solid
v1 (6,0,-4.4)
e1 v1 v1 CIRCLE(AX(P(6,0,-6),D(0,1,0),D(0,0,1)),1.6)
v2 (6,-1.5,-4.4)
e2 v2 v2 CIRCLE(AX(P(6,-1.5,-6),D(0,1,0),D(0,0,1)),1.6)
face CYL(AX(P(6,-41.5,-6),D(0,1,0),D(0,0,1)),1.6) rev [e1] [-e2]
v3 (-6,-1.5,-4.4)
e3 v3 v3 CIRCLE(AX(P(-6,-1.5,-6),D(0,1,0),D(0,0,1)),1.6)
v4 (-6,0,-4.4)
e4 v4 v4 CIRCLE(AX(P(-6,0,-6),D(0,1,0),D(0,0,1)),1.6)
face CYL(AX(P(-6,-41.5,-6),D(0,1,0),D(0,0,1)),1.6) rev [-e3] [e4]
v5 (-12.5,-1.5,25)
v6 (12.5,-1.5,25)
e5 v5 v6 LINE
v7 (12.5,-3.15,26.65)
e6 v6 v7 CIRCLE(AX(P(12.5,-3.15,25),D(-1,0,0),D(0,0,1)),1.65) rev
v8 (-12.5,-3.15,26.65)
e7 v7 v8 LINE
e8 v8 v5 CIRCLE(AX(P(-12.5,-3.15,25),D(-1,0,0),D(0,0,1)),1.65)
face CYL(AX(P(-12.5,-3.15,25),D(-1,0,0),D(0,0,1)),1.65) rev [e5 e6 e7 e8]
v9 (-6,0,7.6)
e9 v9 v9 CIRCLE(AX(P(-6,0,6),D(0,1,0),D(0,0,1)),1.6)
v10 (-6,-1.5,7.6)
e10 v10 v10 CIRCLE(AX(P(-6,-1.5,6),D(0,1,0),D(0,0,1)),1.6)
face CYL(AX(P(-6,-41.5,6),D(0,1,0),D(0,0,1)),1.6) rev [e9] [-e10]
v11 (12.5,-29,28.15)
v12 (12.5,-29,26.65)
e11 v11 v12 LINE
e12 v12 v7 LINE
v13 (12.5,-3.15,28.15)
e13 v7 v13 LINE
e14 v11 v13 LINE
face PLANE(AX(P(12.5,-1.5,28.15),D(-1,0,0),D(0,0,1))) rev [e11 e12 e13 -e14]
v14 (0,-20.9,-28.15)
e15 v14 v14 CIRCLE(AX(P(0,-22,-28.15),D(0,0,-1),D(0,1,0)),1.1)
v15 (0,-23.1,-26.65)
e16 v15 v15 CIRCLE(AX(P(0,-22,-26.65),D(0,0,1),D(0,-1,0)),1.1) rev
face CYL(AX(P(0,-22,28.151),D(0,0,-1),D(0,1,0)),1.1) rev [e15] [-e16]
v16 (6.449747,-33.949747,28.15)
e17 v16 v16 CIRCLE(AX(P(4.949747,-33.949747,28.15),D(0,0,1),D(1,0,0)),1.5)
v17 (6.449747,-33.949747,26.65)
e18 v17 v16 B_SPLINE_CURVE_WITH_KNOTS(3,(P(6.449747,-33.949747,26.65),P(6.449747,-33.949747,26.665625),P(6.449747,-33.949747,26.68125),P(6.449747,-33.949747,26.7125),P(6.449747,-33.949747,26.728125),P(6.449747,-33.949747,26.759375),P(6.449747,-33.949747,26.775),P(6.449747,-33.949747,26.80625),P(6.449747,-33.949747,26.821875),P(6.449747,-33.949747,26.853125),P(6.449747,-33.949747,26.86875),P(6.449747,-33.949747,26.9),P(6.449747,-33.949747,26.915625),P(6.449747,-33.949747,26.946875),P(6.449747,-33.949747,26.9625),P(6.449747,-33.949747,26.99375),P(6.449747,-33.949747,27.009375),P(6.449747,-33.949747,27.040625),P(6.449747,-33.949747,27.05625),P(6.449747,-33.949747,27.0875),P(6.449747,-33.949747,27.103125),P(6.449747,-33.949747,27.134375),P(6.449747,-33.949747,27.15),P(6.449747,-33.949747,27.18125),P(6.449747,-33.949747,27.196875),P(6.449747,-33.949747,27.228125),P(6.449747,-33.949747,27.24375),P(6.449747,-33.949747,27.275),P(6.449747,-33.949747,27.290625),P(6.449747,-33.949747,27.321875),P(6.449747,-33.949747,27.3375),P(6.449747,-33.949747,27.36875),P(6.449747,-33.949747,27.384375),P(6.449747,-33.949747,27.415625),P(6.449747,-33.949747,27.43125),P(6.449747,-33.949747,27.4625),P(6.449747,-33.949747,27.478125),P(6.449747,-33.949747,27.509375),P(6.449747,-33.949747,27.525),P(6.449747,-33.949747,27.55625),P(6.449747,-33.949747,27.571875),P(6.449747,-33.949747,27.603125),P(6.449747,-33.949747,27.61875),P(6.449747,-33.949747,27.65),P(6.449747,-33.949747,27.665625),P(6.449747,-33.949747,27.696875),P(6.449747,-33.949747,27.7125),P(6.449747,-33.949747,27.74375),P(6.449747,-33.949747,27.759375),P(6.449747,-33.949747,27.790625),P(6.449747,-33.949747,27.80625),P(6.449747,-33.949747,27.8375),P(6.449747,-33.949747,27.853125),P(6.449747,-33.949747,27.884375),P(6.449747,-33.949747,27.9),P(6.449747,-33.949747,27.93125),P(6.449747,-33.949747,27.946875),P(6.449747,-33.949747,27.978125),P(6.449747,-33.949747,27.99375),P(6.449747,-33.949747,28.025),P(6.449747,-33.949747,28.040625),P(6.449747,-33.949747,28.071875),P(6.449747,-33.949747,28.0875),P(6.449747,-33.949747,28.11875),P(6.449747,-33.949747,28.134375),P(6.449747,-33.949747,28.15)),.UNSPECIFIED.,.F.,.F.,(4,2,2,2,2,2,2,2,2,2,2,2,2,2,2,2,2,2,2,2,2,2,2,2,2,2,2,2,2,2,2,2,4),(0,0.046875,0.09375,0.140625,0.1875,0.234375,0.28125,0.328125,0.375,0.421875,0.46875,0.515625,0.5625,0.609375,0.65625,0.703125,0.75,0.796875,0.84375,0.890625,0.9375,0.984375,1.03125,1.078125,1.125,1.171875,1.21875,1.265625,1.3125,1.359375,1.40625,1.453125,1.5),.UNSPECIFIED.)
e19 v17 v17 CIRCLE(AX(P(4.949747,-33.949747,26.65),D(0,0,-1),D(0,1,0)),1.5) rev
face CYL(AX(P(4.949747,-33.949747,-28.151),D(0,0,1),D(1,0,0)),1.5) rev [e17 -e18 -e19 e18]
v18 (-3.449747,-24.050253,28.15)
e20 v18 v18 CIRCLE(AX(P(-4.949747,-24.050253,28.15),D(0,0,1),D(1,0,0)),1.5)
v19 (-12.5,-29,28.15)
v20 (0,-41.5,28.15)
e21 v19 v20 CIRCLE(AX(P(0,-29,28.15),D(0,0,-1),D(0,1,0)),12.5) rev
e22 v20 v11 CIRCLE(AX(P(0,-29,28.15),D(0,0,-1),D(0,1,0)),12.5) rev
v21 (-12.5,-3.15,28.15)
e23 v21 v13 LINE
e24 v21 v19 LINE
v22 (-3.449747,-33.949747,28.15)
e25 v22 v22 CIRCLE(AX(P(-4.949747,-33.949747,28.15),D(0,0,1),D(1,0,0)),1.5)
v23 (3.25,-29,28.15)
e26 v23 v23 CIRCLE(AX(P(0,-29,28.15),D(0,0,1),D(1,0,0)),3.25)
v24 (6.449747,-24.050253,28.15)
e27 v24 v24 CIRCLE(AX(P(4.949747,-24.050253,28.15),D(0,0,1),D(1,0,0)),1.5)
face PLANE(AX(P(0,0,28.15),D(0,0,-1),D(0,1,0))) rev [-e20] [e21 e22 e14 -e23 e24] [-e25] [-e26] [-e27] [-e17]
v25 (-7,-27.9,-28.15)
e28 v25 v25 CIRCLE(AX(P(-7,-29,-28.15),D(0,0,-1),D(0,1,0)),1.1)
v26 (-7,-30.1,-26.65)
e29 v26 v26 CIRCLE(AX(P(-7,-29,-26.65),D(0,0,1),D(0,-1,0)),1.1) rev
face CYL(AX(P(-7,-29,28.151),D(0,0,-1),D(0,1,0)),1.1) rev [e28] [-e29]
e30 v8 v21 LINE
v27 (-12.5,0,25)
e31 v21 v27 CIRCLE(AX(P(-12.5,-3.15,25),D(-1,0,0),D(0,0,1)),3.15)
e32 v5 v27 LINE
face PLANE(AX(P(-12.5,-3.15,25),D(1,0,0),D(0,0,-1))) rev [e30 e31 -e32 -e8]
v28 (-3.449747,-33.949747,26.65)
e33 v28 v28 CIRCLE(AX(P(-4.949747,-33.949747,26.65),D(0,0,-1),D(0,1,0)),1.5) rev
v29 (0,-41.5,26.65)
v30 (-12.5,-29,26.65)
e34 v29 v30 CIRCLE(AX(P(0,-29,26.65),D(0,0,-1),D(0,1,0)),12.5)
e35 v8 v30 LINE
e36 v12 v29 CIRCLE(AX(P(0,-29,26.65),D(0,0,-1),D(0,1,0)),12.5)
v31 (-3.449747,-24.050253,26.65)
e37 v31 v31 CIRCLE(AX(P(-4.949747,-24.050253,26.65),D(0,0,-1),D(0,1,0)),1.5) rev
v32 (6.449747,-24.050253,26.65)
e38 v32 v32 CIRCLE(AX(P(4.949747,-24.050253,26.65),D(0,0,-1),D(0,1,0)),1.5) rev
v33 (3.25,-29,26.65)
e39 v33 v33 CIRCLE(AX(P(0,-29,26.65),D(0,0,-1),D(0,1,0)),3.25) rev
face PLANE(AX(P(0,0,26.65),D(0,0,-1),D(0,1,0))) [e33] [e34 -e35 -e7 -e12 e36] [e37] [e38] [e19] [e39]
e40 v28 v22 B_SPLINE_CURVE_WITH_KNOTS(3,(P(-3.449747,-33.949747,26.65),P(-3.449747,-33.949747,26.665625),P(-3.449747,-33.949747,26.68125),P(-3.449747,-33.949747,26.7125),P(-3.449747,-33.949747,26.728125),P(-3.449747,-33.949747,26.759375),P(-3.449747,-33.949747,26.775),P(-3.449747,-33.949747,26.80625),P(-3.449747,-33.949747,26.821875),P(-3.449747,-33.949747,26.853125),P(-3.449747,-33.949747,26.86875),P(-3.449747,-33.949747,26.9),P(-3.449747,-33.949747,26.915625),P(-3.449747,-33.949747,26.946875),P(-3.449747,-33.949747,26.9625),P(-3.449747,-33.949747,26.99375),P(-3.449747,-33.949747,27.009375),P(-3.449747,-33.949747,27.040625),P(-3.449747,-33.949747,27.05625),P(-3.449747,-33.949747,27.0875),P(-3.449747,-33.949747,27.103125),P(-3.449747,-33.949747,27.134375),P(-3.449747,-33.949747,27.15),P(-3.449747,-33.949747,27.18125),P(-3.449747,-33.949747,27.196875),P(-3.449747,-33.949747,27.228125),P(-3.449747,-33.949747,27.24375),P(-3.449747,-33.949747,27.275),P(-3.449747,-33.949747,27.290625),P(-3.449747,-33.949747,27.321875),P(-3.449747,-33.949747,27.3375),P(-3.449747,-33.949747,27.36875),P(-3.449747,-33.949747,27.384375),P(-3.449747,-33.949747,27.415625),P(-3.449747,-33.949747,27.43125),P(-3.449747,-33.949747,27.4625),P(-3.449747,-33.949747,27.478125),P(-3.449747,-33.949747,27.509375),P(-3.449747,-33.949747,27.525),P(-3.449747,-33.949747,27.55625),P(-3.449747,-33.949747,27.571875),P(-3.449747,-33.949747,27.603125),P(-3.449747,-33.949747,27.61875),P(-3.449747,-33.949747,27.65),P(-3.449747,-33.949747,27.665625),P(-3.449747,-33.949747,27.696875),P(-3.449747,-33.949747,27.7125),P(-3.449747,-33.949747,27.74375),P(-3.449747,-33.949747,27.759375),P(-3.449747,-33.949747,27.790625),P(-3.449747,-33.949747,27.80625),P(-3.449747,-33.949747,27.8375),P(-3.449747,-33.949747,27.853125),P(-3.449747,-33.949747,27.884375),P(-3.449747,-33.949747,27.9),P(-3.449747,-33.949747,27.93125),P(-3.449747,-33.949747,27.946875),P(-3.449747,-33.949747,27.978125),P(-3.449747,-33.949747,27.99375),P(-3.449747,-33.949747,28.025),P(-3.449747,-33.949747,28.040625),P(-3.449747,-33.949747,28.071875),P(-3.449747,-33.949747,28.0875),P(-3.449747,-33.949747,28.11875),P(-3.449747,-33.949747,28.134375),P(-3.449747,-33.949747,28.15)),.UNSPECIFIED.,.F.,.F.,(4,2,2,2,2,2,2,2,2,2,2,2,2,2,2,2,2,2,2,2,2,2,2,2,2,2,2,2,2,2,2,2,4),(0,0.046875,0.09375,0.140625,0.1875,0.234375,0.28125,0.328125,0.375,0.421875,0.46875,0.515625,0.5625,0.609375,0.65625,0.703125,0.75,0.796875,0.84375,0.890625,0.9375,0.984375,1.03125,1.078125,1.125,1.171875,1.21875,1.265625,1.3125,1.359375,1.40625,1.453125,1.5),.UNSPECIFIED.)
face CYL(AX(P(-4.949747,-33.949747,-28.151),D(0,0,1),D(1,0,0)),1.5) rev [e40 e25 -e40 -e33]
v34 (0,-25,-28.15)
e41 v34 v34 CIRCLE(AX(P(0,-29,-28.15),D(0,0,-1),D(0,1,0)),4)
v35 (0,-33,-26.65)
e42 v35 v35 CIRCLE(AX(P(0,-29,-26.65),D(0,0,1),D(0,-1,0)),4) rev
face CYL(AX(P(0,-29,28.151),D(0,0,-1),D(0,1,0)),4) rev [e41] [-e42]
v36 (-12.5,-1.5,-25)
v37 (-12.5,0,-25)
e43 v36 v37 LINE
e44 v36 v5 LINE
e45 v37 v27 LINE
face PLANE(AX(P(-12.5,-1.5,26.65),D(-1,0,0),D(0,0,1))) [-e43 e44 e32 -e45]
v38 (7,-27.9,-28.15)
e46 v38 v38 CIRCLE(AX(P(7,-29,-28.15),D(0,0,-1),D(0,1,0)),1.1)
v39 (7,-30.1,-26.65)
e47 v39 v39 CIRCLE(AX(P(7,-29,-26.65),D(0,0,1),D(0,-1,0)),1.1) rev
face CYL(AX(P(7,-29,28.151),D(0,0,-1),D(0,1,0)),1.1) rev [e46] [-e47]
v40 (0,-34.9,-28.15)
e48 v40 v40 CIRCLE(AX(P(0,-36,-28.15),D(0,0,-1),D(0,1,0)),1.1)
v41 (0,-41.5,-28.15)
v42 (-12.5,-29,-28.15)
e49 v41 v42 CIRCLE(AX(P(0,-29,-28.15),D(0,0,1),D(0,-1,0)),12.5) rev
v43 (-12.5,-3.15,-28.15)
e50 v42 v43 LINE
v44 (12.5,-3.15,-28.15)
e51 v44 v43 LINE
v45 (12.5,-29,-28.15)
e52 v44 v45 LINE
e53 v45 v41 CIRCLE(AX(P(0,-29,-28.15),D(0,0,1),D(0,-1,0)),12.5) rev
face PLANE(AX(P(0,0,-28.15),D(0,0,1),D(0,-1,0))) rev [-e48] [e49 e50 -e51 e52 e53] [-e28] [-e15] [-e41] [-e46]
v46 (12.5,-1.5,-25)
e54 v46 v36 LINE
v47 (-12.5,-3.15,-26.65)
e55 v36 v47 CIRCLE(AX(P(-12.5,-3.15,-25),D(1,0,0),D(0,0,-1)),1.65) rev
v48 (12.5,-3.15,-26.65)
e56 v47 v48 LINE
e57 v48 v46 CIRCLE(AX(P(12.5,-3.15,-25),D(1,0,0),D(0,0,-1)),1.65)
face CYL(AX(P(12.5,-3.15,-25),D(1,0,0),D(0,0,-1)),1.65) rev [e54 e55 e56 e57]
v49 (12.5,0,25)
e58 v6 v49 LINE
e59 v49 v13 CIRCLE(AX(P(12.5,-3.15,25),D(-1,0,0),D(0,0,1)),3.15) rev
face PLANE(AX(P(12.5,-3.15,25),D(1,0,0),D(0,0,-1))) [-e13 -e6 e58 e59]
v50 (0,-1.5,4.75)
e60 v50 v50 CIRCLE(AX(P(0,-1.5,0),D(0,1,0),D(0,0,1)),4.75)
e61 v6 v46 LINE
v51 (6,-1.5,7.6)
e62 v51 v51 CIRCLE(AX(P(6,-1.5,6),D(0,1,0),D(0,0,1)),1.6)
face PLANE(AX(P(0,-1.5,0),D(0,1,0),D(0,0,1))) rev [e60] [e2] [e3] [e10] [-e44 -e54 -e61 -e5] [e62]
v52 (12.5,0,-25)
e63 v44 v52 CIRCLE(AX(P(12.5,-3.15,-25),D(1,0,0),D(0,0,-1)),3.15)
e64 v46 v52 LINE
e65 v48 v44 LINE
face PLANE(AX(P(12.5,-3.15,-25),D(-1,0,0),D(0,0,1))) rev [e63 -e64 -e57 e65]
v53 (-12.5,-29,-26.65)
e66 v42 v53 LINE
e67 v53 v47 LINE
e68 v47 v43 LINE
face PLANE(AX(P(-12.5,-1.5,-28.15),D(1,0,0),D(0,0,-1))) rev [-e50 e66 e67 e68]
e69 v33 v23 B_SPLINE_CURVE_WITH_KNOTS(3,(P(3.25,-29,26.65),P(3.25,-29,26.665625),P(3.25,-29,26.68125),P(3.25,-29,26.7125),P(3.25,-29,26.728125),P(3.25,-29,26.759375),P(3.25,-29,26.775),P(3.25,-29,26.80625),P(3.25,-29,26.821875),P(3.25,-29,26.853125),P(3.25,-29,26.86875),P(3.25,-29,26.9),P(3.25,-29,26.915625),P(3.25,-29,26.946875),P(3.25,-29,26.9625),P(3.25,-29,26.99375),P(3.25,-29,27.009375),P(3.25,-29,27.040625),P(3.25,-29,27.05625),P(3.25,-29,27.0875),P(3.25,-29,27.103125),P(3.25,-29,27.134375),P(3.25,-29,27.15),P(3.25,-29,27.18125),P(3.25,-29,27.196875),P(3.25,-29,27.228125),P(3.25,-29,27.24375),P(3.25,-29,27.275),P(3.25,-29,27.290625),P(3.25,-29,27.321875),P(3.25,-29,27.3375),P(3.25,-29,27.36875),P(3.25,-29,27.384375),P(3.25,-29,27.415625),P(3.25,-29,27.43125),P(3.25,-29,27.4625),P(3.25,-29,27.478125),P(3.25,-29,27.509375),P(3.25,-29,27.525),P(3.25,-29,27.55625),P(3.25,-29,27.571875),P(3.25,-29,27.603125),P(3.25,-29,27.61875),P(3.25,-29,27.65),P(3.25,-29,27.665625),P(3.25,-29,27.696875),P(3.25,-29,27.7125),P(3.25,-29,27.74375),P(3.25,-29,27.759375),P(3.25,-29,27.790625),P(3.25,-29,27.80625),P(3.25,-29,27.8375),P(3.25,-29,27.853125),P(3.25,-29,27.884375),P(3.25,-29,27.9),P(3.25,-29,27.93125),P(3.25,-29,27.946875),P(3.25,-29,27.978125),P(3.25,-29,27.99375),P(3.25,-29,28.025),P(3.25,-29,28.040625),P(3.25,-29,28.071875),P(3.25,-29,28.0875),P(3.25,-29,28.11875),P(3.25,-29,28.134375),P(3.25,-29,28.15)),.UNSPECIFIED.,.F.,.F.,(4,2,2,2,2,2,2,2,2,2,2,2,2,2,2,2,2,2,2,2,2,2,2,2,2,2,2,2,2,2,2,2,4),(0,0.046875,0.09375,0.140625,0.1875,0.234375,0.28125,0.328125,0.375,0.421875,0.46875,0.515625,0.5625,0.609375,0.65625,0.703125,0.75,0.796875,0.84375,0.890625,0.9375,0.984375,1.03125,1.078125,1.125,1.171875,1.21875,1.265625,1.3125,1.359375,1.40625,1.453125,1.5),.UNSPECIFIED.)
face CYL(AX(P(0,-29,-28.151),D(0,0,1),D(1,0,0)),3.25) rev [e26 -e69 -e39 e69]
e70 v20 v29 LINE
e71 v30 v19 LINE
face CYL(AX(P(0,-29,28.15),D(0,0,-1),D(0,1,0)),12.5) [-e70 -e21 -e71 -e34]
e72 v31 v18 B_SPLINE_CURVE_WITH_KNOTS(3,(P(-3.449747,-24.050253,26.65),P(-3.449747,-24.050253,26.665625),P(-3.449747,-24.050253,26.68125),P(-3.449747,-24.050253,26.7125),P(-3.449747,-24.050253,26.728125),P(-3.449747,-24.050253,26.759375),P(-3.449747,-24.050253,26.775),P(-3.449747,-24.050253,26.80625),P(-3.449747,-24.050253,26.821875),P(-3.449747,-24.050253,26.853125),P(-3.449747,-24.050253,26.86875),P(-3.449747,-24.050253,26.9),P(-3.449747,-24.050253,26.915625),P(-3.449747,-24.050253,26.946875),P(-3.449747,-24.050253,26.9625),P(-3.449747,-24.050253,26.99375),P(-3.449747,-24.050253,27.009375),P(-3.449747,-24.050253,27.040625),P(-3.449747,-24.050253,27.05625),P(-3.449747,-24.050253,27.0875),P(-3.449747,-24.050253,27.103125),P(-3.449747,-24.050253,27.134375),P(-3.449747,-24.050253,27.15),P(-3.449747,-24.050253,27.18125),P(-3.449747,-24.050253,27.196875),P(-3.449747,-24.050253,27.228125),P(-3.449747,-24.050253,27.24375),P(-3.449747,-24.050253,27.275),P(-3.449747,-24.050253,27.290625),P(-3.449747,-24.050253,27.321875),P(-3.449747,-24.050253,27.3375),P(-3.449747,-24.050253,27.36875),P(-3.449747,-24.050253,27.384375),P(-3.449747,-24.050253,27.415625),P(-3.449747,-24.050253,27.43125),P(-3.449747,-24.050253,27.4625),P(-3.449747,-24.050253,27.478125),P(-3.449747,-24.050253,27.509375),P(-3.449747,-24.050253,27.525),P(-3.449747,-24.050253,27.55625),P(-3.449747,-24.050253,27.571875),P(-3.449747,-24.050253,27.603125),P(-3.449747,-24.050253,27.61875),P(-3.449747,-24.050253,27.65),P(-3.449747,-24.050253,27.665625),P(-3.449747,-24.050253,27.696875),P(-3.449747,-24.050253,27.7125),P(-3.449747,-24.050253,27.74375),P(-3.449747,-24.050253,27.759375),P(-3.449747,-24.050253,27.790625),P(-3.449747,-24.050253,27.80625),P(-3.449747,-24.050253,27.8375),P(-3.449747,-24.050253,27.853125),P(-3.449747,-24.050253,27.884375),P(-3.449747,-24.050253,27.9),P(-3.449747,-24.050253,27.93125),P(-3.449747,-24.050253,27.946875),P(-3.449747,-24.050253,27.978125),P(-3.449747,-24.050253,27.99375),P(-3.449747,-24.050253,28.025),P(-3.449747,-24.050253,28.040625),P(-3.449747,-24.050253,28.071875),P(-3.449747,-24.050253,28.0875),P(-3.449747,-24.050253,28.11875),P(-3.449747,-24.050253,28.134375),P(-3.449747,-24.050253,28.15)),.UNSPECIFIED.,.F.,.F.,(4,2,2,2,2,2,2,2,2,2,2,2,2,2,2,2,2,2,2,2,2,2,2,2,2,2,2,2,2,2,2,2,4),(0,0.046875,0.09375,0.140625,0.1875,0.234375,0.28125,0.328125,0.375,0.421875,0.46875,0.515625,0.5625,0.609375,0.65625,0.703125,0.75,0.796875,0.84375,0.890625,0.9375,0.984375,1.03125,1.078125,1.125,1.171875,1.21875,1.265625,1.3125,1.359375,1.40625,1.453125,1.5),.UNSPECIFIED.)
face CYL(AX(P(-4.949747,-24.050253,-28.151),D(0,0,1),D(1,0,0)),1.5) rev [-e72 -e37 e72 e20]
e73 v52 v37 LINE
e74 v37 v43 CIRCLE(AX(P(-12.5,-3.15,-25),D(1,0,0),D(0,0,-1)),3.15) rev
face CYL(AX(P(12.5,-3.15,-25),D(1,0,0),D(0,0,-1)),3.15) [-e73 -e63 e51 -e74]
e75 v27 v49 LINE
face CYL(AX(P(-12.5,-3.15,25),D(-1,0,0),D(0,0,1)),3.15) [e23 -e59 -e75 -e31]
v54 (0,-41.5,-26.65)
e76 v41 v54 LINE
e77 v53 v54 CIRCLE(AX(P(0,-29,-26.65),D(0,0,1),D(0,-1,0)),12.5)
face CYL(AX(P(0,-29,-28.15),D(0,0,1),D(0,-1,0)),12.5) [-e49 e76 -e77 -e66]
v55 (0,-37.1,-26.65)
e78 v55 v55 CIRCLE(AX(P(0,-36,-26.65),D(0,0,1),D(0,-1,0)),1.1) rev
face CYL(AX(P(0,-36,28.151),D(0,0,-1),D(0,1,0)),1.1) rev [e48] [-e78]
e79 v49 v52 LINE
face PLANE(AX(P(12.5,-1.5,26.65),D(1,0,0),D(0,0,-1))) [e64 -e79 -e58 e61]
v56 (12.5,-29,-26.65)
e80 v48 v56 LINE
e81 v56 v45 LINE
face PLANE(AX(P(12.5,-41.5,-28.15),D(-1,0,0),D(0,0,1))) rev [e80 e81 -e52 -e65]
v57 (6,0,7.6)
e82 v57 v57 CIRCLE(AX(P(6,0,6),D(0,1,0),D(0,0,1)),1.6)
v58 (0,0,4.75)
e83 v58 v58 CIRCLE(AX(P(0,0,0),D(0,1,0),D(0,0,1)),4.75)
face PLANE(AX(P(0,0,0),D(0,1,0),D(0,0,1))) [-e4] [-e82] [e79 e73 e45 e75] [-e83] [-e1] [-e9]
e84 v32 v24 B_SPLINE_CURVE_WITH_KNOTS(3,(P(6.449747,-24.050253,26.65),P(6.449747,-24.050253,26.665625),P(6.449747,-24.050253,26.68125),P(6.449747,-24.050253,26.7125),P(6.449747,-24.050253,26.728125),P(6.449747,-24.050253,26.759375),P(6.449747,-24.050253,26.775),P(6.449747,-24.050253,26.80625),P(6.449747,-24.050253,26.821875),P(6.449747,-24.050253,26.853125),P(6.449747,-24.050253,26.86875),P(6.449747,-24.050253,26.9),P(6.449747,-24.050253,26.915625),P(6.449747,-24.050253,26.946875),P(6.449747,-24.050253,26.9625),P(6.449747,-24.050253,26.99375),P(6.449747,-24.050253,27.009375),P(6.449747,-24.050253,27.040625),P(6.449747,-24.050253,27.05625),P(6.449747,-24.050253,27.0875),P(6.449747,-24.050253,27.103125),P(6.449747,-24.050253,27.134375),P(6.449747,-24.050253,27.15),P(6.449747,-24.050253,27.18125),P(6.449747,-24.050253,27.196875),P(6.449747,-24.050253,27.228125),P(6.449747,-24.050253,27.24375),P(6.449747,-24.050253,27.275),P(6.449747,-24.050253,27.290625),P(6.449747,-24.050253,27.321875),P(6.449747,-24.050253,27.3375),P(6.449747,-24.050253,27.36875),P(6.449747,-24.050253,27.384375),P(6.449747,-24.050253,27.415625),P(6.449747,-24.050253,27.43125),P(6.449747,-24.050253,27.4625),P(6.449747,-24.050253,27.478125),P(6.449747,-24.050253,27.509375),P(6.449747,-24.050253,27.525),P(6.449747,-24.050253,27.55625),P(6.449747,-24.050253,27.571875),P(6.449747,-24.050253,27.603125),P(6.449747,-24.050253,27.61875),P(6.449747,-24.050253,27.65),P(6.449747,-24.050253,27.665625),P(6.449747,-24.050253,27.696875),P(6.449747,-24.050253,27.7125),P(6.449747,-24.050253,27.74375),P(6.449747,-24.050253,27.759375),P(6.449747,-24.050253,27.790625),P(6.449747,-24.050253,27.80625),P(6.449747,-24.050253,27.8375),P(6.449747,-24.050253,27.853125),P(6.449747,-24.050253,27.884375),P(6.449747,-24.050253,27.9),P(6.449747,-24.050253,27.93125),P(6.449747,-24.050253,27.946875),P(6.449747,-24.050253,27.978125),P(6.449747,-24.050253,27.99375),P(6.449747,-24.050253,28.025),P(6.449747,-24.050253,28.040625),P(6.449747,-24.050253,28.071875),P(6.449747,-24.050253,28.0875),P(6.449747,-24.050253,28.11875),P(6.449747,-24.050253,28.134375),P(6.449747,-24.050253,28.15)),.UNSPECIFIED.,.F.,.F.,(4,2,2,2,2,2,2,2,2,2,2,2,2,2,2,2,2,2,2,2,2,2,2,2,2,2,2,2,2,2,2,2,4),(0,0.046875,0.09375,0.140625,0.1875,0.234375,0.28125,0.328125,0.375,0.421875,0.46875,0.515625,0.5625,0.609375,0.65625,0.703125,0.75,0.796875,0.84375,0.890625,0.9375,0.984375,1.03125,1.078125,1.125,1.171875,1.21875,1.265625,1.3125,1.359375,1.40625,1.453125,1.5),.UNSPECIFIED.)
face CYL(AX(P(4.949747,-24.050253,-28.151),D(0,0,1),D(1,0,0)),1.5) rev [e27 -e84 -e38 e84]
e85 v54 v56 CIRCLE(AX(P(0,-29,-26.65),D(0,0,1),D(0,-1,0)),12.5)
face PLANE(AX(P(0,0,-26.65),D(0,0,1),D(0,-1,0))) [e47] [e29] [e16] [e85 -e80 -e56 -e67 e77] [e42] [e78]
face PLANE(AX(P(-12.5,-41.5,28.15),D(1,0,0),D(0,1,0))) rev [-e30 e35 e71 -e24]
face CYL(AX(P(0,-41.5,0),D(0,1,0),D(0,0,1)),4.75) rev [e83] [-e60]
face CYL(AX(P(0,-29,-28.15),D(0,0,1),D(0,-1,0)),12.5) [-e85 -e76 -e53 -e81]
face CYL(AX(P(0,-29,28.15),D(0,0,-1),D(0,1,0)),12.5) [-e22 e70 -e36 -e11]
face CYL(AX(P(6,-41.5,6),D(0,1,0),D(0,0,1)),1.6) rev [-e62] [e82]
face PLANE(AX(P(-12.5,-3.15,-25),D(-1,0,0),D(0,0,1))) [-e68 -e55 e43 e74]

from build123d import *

# Parameters (mm, degrees)
SKETCH1_W                      = 25
SKETCH1_H                      = 53.3
BASE_FLANGE1_DEPTH             = 1.5
EDGE_FLANGE1_STRIP_W           = 9.3
EDGE_FLANGE1_STRIP_H           = 1.5
EDGE_FLANGE1_STRIP_CUT_DEPTH   = 25
EDGE_FLANGE1_STRIP_2_W         = 9.3
EDGE_FLANGE1_STRIP_2_H         = 1.5
EDGE_FLANGE1_STRIP_CUT_2_DEPTH = 25
EDGE_FLANGE1_DEPTH             = 25
EDGE_FLANGE1_BEND_DEPTH        = 25
CUT_EXTRUDE1_REACH             = 73.051
SKETCH12_R                     = 1.5
SKETCH12_R_2                   = 3.25
CUT_EXTRUDE2_REACH             = 73.051
SKETCH13_R                     = 4
SKETCH13_R_2                   = 1.1
FILLET1_R                      = 12.5
SKETCH17_R                     = 1.6
SKETCH17_R_2                   = 4.75
CUT_EXTRUDE3_DEPTH             = 52.680968451


# Sheet-metal steps are written as plain solids
with BuildPart() as part:
    # Base-Flange1: sheet metal written as solids
    # Sketch1 → Base-Flange1 (new body)
    with BuildSketch(Plane(origin=(0, 0, 0), x_dir=(1, 0, 0), z_dir=(0, 1, 0))):
        Rectangle(SKETCH1_W, SKETCH1_H)
    extrude(amount=-BASE_FLANGE1_DEPTH)

    # Edge-Flange1: sheet metal written as solids
    # Edge-Flange1 strip (on a plane across the edge) → Edge-Flange1 strip cut (cut)
    with BuildSketch(Plane(origin=(12.5, -1.5, 26.65), x_dir=(0, 0, -1), z_dir=(-1, 0, 0))):
        with Locations((-3, -0.75)):
            Rectangle(EDGE_FLANGE1_STRIP_W, EDGE_FLANGE1_STRIP_H)
    extrude(amount=EDGE_FLANGE1_STRIP_CUT_DEPTH, mode=Mode.SUBTRACT)

    # Edge-Flange1 strip 2 (on a plane across the edge) → Edge-Flange1 strip cut 2 (cut)
    with BuildSketch(Plane(origin=(-12.5, -1.5, -26.65), x_dir=(0, 0, 1), z_dir=(1, 0, 0))):
        with Locations((-3, -0.75)):
            Rectangle(EDGE_FLANGE1_STRIP_2_W, EDGE_FLANGE1_STRIP_2_H)
    extrude(amount=EDGE_FLANGE1_STRIP_CUT_2_DEPTH, mode=Mode.SUBTRACT)

    # Edge-Flange1 section (on a plane across the edge) → Edge-Flange1 (add)
    with BuildSketch(Plane(origin=(12.5, -1.5, 26.65), x_dir=(0, 0, -1), z_dir=(-1, 0, 0))):
        with BuildLine():
            Line((-1.5, 1.65), (-1.5, 40))
            Line((-1.5, 40), (0, 40))
            Line((0, 40), (0, 1.65))
            ThreePointArc((0, 1.65), (0.483273811, 0.483273811), (1.65, 0))
            Line((1.65, 0), (1.65, -1.5))
            ThreePointArc((1.65, -1.5), (-0.577386361, -0.577386361), (-1.5, 1.65))
        make_face()
    extrude(amount=EDGE_FLANGE1_DEPTH)

    # Edge-Flange1 section 2 (on a plane across the edge) → Edge-Flange1 bend (add)
    with BuildSketch(Plane(origin=(-12.5, -1.5, -26.65), x_dir=(0, 0, 1), z_dir=(1, 0, 0))):
        with BuildLine():
            Line((-1.5, 1.65), (-1.5, 40))
            Line((-1.5, 40), (0, 40))
            Line((0, 40), (0, 1.65))
            ThreePointArc((0, 1.65), (0.483273811, 0.483273811), (1.65, 0))
            Line((1.65, 0), (1.65, -1.5))
            ThreePointArc((1.65, -1.5), (-0.577386361, -0.577386361), (-1.5, 1.65))
        make_face()
    extrude(amount=EDGE_FLANGE1_BEND_DEPTH)

    # Sketch12 → Cut-Extrude1 (cut, up to next)
    with BuildSketch(Plane.XY.offset(28.15), mode=Mode.PRIVATE) as cut_extrude1_sk1:
        with Locations((-4.949747468, -24.050252532)):
            Circle(SKETCH12_R)
    cut_extrude1_tool1 = extrude(cut_extrude1_sk1.sketch, amount=-CUT_EXTRUDE1_REACH, mode=Mode.PRIVATE) & part.part
    # Sketch12 → Cut-Extrude1 (cut, up to next)
    with BuildSketch(Plane.XY.offset(28.15), mode=Mode.PRIVATE) as cut_extrude1_sk2:
        with Locations((4.949747468, -24.050252532)):
            Circle(SKETCH12_R)
    cut_extrude1_tool2 = extrude(cut_extrude1_sk2.sketch, amount=-CUT_EXTRUDE1_REACH, mode=Mode.PRIVATE) & part.part
    # Sketch12 → Cut-Extrude1 (cut, up to next)
    with BuildSketch(Plane.XY.offset(28.15), mode=Mode.PRIVATE) as cut_extrude1_sk3:
        with Locations((-4.949747468, -33.949747468)):
            Circle(SKETCH12_R)
    cut_extrude1_tool3 = extrude(cut_extrude1_sk3.sketch, amount=-CUT_EXTRUDE1_REACH, mode=Mode.PRIVATE) & part.part
    # Sketch12 → Cut-Extrude1 (cut, up to next)
    with BuildSketch(Plane.XY.offset(28.15), mode=Mode.PRIVATE) as cut_extrude1_sk4:
        with Locations((4.949747468, -33.949747468)):
            Circle(SKETCH12_R)
    cut_extrude1_tool4 = extrude(cut_extrude1_sk4.sketch, amount=-CUT_EXTRUDE1_REACH, mode=Mode.PRIVATE) & part.part
    # Sketch12 → Cut-Extrude1 (cut, up to next)
    with BuildSketch(Plane.XY.offset(28.15), mode=Mode.PRIVATE) as cut_extrude1_sk5:
        with Locations((0, -29)):
            Circle(SKETCH12_R_2)
    cut_extrude1_tool5 = extrude(cut_extrude1_sk5.sketch, amount=-CUT_EXTRUDE1_REACH, mode=Mode.PRIVATE) & part.part
    add(cut_extrude1_tool1.solids().sort_by_distance((-4.949747, -24.050253, 28.15))[0], mode=Mode.SUBTRACT)
    add(cut_extrude1_tool2.solids().sort_by_distance((4.949747, -24.050253, 28.15))[0], mode=Mode.SUBTRACT)
    add(cut_extrude1_tool3.solids().sort_by_distance((-4.949747, -33.949747, 28.15))[0], mode=Mode.SUBTRACT)
    add(cut_extrude1_tool4.solids().sort_by_distance((4.949747, -33.949747, 28.15))[0], mode=Mode.SUBTRACT)
    add(cut_extrude1_tool5.solids().sort_by_distance((0, -29, 28.15))[0], mode=Mode.SUBTRACT)

    # Sketch13 → Cut-Extrude2 (cut, up to next)
    with BuildSketch(Plane(origin=(0, 0, -28.15), x_dir=(-1, 0, 0), z_dir=(0, 0, -1)), mode=Mode.PRIVATE) as cut_extrude2_sk1:
        with Locations(Location((0, -29, 0), (0, 0, 90))):
            Circle(SKETCH13_R)
    cut_extrude2_tool1 = extrude(cut_extrude2_sk1.sketch, amount=-CUT_EXTRUDE2_REACH, mode=Mode.PRIVATE) & part.part
    # Sketch13 → Cut-Extrude2 (cut, up to next)
    with BuildSketch(Plane(origin=(0, 0, -28.15), x_dir=(-1, 0, 0), z_dir=(0, 0, -1)), mode=Mode.PRIVATE) as cut_extrude2_sk2:
        with Locations(Location((0, -36, 0), (0, 0, 90))):
            Circle(SKETCH13_R_2)
    cut_extrude2_tool2 = extrude(cut_extrude2_sk2.sketch, amount=-CUT_EXTRUDE2_REACH, mode=Mode.PRIVATE) & part.part
    # Sketch13 → Cut-Extrude2 (cut, up to next)
    with BuildSketch(Plane(origin=(0, 0, -28.15), x_dir=(-1, 0, 0), z_dir=(0, 0, -1)), mode=Mode.PRIVATE) as cut_extrude2_sk3:
        with Locations(Location((-7, -29, 0), (0, 0, 90))):
            Circle(SKETCH13_R_2)
    cut_extrude2_tool3 = extrude(cut_extrude2_sk3.sketch, amount=-CUT_EXTRUDE2_REACH, mode=Mode.PRIVATE) & part.part
    # Sketch13 → Cut-Extrude2 (cut, up to next)
    with BuildSketch(Plane(origin=(0, 0, -28.15), x_dir=(-1, 0, 0), z_dir=(0, 0, -1)), mode=Mode.PRIVATE) as cut_extrude2_sk4:
        with Locations(Location((0, -22, 0), (0, 0, 90))):
            Circle(SKETCH13_R_2)
    cut_extrude2_tool4 = extrude(cut_extrude2_sk4.sketch, amount=-CUT_EXTRUDE2_REACH, mode=Mode.PRIVATE) & part.part
    # Sketch13 → Cut-Extrude2 (cut, up to next)
    with BuildSketch(Plane(origin=(0, 0, -28.15), x_dir=(-1, 0, 0), z_dir=(0, 0, -1)), mode=Mode.PRIVATE) as cut_extrude2_sk5:
        with Locations(Location((7, -29, 0), (0, 0, 90))):
            Circle(SKETCH13_R_2)
    cut_extrude2_tool5 = extrude(cut_extrude2_sk5.sketch, amount=-CUT_EXTRUDE2_REACH, mode=Mode.PRIVATE) & part.part
    add(cut_extrude2_tool1.solids().sort_by_distance((0, -29, -28.15))[0], mode=Mode.SUBTRACT)
    add(cut_extrude2_tool2.solids().sort_by_distance((0, -36, -28.15))[0], mode=Mode.SUBTRACT)
    add(cut_extrude2_tool3.solids().sort_by_distance((7, -29, -28.15))[0], mode=Mode.SUBTRACT)
    add(cut_extrude2_tool4.solids().sort_by_distance((0, -22, -28.15))[0], mode=Mode.SUBTRACT)
    add(cut_extrude2_tool5.solids().sort_by_distance((-7, -29, -28.15))[0], mode=Mode.SUBTRACT)

    # Fillet1
    fillet1_edges = [part.edges().sort_by_distance(p)[0] for p in [
        (12.5, -41.5, 27.4),
        (-12.5, -41.5, 27.4),
        (-12.5, -41.5, -27.4),
        (12.5, -41.5, -27.4),
    ]]
    fillet(fillet1_edges, radius=FILLET1_R - 0.0001)  # a hair under: the kernel refuses the full size

    # Sketch17 → Cut-Extrude3 (cut, through all)
    with BuildSketch(Plane(origin=(0, 0, 0), x_dir=(1, 0, 0), z_dir=(0, 1, 0))):
        with Locations(Location((-6, 6, 0), (0, 0, 270))):
            Circle(SKETCH17_R)
        with Locations(Location((6, 6, 0), (0, 0, 270))):
            Circle(SKETCH17_R)
        with Locations(Location((6, -6, 0), (0, 0, 270))):
            Circle(SKETCH17_R)
        with Locations(Location((-6, -6, 0), (0, 0, 270))):
            Circle(SKETCH17_R)
        with Locations(Location((0, 0, 0), (0, 0, 270))):
            Circle(SKETCH17_R_2)
    extrude(amount=-CUT_EXTRUDE3_DEPTH, mode=Mode.SUBTRACT)


solid = part.part
